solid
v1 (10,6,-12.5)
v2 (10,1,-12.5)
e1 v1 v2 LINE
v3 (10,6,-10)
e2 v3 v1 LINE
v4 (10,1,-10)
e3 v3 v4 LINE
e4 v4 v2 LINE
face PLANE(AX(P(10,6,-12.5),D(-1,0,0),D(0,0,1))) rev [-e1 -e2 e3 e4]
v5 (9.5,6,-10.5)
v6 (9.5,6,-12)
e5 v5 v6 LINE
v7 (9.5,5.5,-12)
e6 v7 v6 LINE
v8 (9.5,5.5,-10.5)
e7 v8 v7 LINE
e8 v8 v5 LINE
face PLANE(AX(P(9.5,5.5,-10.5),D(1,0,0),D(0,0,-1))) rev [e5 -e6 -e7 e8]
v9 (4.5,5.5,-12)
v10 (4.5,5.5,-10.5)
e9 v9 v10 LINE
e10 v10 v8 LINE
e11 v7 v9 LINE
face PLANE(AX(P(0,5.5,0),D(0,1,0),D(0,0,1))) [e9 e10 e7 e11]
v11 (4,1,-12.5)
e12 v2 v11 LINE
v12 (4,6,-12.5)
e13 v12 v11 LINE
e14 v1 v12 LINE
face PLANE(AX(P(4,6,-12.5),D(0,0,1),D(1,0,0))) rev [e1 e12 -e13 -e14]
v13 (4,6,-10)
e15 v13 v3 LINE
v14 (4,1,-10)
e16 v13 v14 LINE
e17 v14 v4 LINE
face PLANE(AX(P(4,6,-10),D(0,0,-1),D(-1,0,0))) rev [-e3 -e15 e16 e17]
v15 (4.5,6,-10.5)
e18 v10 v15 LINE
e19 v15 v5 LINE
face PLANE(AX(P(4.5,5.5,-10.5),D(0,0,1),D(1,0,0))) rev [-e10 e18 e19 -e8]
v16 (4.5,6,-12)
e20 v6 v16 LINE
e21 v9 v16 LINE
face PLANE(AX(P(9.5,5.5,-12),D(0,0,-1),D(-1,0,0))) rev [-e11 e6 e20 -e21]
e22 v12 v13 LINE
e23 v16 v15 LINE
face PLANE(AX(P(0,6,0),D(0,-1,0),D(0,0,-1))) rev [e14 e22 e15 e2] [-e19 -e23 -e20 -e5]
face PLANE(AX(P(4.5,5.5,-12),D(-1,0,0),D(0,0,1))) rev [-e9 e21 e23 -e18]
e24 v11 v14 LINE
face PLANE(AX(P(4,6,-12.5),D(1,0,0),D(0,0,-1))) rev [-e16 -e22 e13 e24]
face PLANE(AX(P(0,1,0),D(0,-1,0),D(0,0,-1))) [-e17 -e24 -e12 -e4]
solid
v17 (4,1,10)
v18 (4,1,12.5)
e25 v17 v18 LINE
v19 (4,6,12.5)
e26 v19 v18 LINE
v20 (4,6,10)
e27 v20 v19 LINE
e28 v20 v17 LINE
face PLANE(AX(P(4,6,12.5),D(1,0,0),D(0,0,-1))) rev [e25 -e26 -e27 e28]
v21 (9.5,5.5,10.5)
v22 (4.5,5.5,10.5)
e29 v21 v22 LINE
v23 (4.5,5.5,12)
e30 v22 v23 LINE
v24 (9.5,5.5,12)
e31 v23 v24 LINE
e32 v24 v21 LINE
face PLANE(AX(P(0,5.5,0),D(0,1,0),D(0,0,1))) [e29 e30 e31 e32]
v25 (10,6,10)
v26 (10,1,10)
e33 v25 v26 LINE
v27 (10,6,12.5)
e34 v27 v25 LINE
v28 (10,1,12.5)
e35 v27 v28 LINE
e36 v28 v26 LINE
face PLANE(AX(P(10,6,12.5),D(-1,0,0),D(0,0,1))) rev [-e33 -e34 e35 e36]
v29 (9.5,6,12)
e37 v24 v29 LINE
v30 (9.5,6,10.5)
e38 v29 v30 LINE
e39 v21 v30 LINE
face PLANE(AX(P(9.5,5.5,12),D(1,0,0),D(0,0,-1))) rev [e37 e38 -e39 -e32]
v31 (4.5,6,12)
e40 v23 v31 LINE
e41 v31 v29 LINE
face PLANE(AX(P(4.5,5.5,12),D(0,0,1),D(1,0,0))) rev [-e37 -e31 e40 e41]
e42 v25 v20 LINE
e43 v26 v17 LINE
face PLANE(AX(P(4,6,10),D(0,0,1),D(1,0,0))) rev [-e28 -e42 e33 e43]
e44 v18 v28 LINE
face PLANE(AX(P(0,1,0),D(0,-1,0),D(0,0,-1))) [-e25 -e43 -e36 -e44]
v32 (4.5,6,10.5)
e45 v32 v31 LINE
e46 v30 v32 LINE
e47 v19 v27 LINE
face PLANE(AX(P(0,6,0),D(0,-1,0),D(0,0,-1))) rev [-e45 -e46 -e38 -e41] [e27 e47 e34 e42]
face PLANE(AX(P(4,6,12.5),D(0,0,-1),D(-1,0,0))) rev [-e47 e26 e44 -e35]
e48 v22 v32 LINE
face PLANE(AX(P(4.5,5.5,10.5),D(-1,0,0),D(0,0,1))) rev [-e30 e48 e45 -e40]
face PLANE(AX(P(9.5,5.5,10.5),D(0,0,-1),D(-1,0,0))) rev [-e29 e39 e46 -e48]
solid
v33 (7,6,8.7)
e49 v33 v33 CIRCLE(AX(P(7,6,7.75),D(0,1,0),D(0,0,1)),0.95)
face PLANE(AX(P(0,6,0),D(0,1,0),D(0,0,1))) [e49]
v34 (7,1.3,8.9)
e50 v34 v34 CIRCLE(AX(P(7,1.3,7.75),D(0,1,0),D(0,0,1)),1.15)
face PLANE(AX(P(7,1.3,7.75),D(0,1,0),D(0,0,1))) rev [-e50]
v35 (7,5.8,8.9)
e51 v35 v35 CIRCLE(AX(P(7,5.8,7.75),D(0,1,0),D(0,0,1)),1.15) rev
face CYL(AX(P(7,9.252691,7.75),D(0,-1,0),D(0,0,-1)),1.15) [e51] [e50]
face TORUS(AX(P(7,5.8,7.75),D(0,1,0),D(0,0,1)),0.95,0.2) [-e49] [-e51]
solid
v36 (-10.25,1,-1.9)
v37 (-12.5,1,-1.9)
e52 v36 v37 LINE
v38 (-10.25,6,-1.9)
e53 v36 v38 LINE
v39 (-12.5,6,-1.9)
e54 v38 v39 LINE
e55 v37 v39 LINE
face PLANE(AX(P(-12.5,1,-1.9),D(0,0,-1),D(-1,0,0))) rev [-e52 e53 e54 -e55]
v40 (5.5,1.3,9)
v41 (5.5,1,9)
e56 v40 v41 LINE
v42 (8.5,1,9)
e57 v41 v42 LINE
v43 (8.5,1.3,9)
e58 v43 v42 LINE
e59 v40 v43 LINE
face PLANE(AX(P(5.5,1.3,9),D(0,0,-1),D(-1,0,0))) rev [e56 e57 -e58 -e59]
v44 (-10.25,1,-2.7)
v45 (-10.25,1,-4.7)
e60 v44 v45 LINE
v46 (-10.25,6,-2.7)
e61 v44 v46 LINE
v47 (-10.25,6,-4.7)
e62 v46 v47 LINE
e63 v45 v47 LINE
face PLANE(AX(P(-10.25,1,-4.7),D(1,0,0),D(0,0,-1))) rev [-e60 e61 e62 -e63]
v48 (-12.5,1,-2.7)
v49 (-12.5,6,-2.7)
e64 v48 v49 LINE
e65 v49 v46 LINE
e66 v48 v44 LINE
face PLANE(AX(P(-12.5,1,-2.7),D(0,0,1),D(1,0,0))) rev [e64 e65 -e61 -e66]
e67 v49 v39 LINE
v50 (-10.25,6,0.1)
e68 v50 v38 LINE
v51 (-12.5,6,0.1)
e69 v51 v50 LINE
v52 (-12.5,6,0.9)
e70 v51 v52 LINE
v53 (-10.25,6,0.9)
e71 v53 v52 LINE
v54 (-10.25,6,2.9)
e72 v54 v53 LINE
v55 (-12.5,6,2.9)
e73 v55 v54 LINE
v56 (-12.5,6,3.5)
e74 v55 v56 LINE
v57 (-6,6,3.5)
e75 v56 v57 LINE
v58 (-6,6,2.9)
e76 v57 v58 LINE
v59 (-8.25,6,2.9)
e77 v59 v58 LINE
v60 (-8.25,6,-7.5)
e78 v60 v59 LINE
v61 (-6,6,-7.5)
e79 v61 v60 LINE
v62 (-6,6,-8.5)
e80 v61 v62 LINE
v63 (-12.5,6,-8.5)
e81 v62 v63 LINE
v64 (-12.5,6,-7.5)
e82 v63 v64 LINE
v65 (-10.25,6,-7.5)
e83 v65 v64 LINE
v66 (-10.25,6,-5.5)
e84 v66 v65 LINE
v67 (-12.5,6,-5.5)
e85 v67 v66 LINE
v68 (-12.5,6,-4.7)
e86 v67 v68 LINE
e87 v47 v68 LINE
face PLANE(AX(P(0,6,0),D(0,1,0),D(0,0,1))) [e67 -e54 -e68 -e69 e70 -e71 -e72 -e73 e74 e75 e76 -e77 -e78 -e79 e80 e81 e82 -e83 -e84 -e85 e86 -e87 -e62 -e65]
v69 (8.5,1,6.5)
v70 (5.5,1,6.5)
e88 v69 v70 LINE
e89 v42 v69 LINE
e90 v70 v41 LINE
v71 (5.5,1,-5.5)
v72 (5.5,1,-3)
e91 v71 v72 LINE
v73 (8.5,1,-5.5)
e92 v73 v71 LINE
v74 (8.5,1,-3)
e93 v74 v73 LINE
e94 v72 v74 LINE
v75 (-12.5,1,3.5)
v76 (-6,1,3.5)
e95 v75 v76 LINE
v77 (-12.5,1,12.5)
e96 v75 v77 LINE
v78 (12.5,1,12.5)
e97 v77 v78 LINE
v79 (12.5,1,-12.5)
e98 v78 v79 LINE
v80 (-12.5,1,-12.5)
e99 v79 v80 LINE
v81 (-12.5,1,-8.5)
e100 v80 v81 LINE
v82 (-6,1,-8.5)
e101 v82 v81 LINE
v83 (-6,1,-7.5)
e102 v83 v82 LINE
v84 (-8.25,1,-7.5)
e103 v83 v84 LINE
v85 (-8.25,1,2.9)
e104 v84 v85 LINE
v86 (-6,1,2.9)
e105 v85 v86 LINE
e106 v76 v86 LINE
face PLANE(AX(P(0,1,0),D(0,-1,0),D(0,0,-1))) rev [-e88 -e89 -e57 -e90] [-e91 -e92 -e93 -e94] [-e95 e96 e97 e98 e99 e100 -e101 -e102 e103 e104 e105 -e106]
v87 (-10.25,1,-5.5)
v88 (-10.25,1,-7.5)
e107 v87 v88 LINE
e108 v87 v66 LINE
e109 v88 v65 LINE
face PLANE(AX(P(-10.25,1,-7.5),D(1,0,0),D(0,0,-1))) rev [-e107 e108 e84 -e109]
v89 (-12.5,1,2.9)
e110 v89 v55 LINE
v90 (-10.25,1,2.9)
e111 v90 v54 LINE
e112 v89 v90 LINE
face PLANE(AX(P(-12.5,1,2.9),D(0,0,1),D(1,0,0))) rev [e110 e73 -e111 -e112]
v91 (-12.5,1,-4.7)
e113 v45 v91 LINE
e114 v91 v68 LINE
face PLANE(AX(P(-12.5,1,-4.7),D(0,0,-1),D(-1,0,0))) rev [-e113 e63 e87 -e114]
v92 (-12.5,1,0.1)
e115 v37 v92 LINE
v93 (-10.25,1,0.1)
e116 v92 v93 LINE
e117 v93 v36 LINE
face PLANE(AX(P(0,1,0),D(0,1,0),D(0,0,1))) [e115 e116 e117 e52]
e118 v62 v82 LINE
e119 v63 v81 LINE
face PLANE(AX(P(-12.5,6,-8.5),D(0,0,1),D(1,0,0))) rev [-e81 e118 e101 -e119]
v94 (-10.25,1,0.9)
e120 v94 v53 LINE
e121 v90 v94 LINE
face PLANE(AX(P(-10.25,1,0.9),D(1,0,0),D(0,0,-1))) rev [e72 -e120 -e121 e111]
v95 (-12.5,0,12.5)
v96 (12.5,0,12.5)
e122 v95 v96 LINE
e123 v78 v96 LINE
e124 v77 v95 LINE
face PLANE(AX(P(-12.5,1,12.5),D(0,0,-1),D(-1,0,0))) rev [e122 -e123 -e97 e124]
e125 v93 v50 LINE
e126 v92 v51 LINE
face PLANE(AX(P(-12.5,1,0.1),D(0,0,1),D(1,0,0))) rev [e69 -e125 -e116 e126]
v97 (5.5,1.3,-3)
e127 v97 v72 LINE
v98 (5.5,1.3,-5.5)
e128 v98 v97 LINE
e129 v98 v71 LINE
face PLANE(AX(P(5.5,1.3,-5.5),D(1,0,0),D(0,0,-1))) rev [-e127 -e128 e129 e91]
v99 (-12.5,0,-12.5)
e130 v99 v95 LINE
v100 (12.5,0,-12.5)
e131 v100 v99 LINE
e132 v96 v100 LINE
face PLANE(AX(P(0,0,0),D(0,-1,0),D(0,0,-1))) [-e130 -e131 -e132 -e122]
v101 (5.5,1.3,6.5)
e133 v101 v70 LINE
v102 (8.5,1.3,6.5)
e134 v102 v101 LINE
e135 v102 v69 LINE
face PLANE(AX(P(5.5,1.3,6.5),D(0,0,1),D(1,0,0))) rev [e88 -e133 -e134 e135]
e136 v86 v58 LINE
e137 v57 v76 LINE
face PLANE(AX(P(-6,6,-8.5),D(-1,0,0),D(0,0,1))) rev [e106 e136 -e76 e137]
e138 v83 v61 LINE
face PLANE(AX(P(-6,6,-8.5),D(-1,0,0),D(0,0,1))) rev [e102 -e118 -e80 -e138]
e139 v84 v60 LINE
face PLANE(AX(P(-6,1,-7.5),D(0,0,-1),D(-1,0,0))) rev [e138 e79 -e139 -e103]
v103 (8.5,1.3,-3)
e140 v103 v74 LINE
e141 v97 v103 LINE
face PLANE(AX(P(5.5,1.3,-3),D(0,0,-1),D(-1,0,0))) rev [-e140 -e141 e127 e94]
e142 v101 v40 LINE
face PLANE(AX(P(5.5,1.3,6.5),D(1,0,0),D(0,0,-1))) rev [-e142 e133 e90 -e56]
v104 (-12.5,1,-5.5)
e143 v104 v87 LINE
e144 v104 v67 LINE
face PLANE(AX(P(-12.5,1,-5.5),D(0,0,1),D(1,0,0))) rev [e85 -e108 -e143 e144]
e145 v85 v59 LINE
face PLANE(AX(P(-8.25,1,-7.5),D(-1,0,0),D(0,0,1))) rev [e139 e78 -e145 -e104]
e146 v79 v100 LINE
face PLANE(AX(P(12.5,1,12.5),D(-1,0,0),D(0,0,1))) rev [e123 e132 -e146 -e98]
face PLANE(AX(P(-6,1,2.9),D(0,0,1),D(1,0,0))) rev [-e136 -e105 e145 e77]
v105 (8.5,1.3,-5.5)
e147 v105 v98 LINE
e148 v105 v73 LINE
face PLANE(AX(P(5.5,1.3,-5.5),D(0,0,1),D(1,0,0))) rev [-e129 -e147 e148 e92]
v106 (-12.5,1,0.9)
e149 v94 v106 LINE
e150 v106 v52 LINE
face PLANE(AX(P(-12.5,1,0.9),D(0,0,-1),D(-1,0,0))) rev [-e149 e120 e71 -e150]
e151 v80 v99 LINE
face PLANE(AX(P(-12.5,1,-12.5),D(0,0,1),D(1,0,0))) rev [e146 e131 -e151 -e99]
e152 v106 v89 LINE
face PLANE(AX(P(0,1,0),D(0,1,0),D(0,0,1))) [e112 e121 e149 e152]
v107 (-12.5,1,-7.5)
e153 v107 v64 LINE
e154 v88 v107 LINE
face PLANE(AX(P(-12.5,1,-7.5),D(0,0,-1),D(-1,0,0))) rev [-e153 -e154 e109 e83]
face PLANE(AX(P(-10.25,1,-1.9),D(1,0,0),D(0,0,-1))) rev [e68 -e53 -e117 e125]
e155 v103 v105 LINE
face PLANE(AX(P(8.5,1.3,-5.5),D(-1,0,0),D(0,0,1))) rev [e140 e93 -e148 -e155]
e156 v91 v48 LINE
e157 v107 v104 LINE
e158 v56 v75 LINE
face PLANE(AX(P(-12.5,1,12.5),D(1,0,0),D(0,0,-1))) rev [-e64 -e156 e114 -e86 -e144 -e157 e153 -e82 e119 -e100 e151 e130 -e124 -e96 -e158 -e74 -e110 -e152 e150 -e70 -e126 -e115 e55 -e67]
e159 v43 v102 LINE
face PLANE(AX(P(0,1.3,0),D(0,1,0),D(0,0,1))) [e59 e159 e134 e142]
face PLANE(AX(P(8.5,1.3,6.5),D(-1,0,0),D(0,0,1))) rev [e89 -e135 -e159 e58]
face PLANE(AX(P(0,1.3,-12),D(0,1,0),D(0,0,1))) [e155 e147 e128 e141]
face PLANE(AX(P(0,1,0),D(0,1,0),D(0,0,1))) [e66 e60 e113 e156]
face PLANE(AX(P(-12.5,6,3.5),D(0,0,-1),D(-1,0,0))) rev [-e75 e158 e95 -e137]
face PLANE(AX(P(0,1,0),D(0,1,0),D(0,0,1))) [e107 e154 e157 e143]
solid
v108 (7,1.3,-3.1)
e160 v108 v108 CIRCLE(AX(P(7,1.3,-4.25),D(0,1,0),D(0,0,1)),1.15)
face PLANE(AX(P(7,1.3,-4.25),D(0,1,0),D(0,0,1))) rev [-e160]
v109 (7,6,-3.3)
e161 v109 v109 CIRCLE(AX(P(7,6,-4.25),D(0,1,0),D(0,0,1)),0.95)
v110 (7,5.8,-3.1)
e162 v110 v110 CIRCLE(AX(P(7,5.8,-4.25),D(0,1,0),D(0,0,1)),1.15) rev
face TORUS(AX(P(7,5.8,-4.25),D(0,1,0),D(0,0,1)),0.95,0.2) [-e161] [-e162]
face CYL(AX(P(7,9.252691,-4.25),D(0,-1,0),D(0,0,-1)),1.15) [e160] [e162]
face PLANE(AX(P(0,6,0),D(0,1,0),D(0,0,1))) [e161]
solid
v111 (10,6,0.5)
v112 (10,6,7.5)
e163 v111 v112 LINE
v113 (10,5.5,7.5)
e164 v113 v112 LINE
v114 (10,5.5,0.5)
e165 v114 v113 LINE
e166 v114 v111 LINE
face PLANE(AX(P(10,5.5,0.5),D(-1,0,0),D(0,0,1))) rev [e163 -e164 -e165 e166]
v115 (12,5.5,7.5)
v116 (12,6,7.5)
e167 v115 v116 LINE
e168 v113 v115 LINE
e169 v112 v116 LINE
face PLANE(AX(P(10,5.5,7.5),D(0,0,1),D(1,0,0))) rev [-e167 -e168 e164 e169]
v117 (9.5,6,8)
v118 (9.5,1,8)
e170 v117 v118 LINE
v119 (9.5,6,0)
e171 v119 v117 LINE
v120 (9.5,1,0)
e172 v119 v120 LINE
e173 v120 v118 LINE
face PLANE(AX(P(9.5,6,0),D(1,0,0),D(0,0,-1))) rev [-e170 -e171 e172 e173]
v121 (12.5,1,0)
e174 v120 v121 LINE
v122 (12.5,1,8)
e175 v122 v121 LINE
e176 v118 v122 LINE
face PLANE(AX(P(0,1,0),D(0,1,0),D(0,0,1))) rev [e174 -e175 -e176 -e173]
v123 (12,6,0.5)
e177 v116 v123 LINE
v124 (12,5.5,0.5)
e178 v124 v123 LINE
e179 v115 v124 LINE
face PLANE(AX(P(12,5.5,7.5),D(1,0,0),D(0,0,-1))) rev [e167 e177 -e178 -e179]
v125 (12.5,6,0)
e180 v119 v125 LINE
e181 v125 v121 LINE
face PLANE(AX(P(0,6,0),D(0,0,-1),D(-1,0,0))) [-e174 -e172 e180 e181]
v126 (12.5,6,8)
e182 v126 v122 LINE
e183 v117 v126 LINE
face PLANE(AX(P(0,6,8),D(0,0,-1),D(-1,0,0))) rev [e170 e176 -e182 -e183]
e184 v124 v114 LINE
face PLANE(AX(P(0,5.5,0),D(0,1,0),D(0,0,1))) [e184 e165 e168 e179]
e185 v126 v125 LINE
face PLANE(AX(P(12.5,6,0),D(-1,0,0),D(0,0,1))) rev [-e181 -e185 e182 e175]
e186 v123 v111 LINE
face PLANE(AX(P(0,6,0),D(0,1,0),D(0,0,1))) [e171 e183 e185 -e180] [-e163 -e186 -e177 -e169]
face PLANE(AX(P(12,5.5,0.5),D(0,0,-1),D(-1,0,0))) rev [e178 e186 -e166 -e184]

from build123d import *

# Parameters (mm, degrees)
SKETCH1_W             = 25
SKETCH1_H             = 25
BOSS_EXTRUDE1_DEPTH   = 1
SKETCH2_W             = 3
SKETCH2_H             = 2.5
SKETCH2_H_2           = 2.75
BOSS_EXTRUDE2_DEPTH   = 5
SKETCH3_W             = 2
SKETCH3_H             = 7
CUT_EXTRUDE1_DEPTH    = 0.5
SKETCH4_W             = 6
SKETCH4_H             = 2.5
BOSS_EXTRUDE3_DEPTH   = 5
BOSS_EXTRUDE3_2_DEPTH = 5
SKETCH5_W             = 5
SKETCH5_H             = 1.5
CUT_EXTRUDE2_DEPTH    = 0.5
SKETCH6_W             = 6.5
SKETCH6_H             = 12
BOSS_EXTRUDE4_DEPTH   = 5
SKETCH7_W             = 2.25
SKETCH7_H             = 2
CUT_EXTRUDE3_DEPTH    = 5
SKETCH8_W             = 2.25
SKETCH8_H             = 10.4
CUT_EXTRUDE4_DEPTH    = 5
SKETCH9_W             = 3
SKETCH9_H             = 2.5
BOSS_EXTRUDE5_DEPTH   = 0.3
SKETCH10_R            = 1.15
BOSS_EXTRUDE6_DEPTH   = 4.7
FILLET1_R             = 0.2
LPATTERN1_START       = 1.3
LPATTERN1_OUTLINE_R   = 1.15
LPATTERN1_DEPTH       = 4.7
LPATTERN1_START_2     = -5.5
LPATTERN1_2_OUTLINE_W = 3
LPATTERN1_2_OUTLINE_H = 0.3
LPATTERN1_2_DEPTH     = 2.5
FILLET2_R             = 0.2


# Read off the part's stored shape, not the designer's step: LPattern1
with BuildPart() as part:
    # Sketch1 → Boss-Extrude1 (new body)
    with BuildSketch(Plane(origin=(0, 0, 0), x_dir=(1, 0, 0), z_dir=(0, 1, 0))):
        Rectangle(SKETCH1_W, SKETCH1_H)
    extrude(amount=BOSS_EXTRUDE1_DEPTH)

    # Sketch6 → Boss-Extrude4 (add)
    with BuildSketch(Plane(origin=(0, 1, 0), x_dir=(1, 0, 0), z_dir=(0, 1, 0))):
        with Locations((-9.25, 2.5)):
            Rectangle(SKETCH6_W, SKETCH6_H)
    extrude(amount=BOSS_EXTRUDE4_DEPTH)

    # Sketch7 → Cut-Extrude3 (cut)
    with BuildSketch(Plane(origin=(0, 6, 0), x_dir=(1, 0, 0), z_dir=(0, 1, 0))):
        with Locations((-11.375, 6.5)):
            Rectangle(SKETCH7_W, SKETCH7_H)
        with Locations((-11.375, 3.7)):
            Rectangle(SKETCH7_W, SKETCH7_H)
        with Locations((-11.375, 0.9)):
            Rectangle(SKETCH7_W, SKETCH7_H)
        with Locations((-11.375, -1.9)):
            Rectangle(SKETCH7_W, SKETCH7_H)
    extrude(amount=-CUT_EXTRUDE3_DEPTH, mode=Mode.SUBTRACT)

    # Sketch8 → Cut-Extrude4 (cut)
    with BuildSketch(Plane(origin=(0, 6, 0), x_dir=(1, 0, 0), z_dir=(0, 1, 0))):
        with Locations((-7.125, 2.3)):
            Rectangle(SKETCH8_W, SKETCH8_H)
    extrude(amount=-CUT_EXTRUDE4_DEPTH, mode=Mode.SUBTRACT)

    # Sketch9 → Boss-Extrude5 (add)
    with BuildSketch(Plane(origin=(0, 1, 0), x_dir=(1, 0, 0), z_dir=(0, 1, 0))):
        with Locations((7, -7.75)):
            Rectangle(SKETCH9_W, SKETCH9_H)
    extrude(amount=BOSS_EXTRUDE5_DEPTH)

    # LPattern1 2 outline → LPattern1 2 (add)
    with BuildSketch(Plane.XY.offset(LPATTERN1_START_2)):
        with Locations((7, 1.15)):
            Rectangle(LPATTERN1_2_OUTLINE_W, LPATTERN1_2_OUTLINE_H)
    extrude(amount=LPATTERN1_2_DEPTH)


with BuildPart() as body_2:
    # Sketch2 → Boss-Extrude2 (new body)
    with BuildSketch(Plane(origin=(0, 1, 0), x_dir=(1, 0, 0), z_dir=(0, 1, 0))):
        with Locations((11, -6.75)):
            Rectangle(SKETCH2_W, SKETCH2_H)
        with Locations((11, -4.125)):
            Rectangle(SKETCH2_W, SKETCH2_H_2)
        with Locations((11, -1.375)):
            Rectangle(SKETCH2_W, SKETCH2_H_2)
    extrude(amount=BOSS_EXTRUDE2_DEPTH)

    # Sketch3 → Cut-Extrude1 (cut)
    with BuildSketch(Plane(origin=(0, 6, 0), x_dir=(1, 0, 0), z_dir=(0, 1, 0))):
        with Locations((11, -4)):
            Rectangle(SKETCH3_W, SKETCH3_H)
    extrude(amount=-CUT_EXTRUDE1_DEPTH, mode=Mode.SUBTRACT)


with BuildPart() as body_3:
    # Sketch4 → Boss-Extrude3 (new body)
    with BuildSketch(Plane(origin=(0, 1, 0), x_dir=(1, 0, 0), z_dir=(0, 1, 0))):
        with Locations((7, -11.25)):
            Rectangle(SKETCH4_W, SKETCH4_H)
    extrude(amount=BOSS_EXTRUDE3_DEPTH)


with BuildPart() as body_4:
    # Sketch4 → Boss-Extrude3 2 (new body)
    with BuildSketch(Plane(origin=(0, 1, 0), x_dir=(1, 0, 0), z_dir=(0, 1, 0))):
        with Locations((7, 11.25)):
            Rectangle(SKETCH4_W, SKETCH4_H)
    extrude(amount=BOSS_EXTRUDE3_2_DEPTH)


with BuildPart() as cut_extrude2_tool:
    # Sketch5 → Cut-Extrude2 (new body)
    with BuildSketch(Plane(origin=(0, 6, 0), x_dir=(1, 0, 0), z_dir=(0, 1, 0))):
        with Locations((7, -11.25)):
            Rectangle(SKETCH5_W, SKETCH5_H)
        with Locations((7, 11.25)):
            Rectangle(SKETCH5_W, SKETCH5_H)
    extrude(amount=-CUT_EXTRUDE2_DEPTH)


with BuildPart() as body_3_1:
    add(body_3.part)

    # Cut-Extrude2: cut by cut_extrude2_tool
    add(cut_extrude2_tool.part, mode=Mode.SUBTRACT)


with BuildPart() as body_4_1:
    add(body_4.part)

    # Cut-Extrude2: cut by cut_extrude2_tool
    add(cut_extrude2_tool.part, mode=Mode.SUBTRACT)


with BuildPart() as body_5:
    # Sketch10 → Boss-Extrude6 (new body)
    with BuildSketch(Plane(origin=(0, 1.3, 0), x_dir=(1, 0, 0), z_dir=(0, 1, 0))):
        with Locations(Location((7, -7.75, 0), (0, 0, 270))):
            Circle(SKETCH10_R)
    extrude(amount=BOSS_EXTRUDE6_DEPTH)

    # Fillet1
    fillet1_edges = [body_5.edges().sort_by_distance(p)[0] for p in [
        (7, 6, 6.6),
    ]]
    fillet(fillet1_edges, radius=FILLET1_R)


with BuildPart() as body_6:
    # LPattern1 outline → LPattern1 (new body)
    with BuildSketch(Plane(origin=(0, 0, 0), x_dir=(1, 0, 0), z_dir=(0, 1, 0)).offset(LPATTERN1_START)):
        with Locations((7, 4.25)):
            Circle(LPATTERN1_OUTLINE_R)
    extrude(amount=LPATTERN1_DEPTH)

    # Fillet2
    fillet2_edges = [body_6.edges().sort_by_distance(p)[0] for p in [
        (5.85, 6, -4.25),
    ]]
    fillet(fillet2_edges, radius=FILLET2_R)


solid = Compound([part.part, body_2.part, body_3_1.part, body_4_1.part, body_5.part, body_6.part])
